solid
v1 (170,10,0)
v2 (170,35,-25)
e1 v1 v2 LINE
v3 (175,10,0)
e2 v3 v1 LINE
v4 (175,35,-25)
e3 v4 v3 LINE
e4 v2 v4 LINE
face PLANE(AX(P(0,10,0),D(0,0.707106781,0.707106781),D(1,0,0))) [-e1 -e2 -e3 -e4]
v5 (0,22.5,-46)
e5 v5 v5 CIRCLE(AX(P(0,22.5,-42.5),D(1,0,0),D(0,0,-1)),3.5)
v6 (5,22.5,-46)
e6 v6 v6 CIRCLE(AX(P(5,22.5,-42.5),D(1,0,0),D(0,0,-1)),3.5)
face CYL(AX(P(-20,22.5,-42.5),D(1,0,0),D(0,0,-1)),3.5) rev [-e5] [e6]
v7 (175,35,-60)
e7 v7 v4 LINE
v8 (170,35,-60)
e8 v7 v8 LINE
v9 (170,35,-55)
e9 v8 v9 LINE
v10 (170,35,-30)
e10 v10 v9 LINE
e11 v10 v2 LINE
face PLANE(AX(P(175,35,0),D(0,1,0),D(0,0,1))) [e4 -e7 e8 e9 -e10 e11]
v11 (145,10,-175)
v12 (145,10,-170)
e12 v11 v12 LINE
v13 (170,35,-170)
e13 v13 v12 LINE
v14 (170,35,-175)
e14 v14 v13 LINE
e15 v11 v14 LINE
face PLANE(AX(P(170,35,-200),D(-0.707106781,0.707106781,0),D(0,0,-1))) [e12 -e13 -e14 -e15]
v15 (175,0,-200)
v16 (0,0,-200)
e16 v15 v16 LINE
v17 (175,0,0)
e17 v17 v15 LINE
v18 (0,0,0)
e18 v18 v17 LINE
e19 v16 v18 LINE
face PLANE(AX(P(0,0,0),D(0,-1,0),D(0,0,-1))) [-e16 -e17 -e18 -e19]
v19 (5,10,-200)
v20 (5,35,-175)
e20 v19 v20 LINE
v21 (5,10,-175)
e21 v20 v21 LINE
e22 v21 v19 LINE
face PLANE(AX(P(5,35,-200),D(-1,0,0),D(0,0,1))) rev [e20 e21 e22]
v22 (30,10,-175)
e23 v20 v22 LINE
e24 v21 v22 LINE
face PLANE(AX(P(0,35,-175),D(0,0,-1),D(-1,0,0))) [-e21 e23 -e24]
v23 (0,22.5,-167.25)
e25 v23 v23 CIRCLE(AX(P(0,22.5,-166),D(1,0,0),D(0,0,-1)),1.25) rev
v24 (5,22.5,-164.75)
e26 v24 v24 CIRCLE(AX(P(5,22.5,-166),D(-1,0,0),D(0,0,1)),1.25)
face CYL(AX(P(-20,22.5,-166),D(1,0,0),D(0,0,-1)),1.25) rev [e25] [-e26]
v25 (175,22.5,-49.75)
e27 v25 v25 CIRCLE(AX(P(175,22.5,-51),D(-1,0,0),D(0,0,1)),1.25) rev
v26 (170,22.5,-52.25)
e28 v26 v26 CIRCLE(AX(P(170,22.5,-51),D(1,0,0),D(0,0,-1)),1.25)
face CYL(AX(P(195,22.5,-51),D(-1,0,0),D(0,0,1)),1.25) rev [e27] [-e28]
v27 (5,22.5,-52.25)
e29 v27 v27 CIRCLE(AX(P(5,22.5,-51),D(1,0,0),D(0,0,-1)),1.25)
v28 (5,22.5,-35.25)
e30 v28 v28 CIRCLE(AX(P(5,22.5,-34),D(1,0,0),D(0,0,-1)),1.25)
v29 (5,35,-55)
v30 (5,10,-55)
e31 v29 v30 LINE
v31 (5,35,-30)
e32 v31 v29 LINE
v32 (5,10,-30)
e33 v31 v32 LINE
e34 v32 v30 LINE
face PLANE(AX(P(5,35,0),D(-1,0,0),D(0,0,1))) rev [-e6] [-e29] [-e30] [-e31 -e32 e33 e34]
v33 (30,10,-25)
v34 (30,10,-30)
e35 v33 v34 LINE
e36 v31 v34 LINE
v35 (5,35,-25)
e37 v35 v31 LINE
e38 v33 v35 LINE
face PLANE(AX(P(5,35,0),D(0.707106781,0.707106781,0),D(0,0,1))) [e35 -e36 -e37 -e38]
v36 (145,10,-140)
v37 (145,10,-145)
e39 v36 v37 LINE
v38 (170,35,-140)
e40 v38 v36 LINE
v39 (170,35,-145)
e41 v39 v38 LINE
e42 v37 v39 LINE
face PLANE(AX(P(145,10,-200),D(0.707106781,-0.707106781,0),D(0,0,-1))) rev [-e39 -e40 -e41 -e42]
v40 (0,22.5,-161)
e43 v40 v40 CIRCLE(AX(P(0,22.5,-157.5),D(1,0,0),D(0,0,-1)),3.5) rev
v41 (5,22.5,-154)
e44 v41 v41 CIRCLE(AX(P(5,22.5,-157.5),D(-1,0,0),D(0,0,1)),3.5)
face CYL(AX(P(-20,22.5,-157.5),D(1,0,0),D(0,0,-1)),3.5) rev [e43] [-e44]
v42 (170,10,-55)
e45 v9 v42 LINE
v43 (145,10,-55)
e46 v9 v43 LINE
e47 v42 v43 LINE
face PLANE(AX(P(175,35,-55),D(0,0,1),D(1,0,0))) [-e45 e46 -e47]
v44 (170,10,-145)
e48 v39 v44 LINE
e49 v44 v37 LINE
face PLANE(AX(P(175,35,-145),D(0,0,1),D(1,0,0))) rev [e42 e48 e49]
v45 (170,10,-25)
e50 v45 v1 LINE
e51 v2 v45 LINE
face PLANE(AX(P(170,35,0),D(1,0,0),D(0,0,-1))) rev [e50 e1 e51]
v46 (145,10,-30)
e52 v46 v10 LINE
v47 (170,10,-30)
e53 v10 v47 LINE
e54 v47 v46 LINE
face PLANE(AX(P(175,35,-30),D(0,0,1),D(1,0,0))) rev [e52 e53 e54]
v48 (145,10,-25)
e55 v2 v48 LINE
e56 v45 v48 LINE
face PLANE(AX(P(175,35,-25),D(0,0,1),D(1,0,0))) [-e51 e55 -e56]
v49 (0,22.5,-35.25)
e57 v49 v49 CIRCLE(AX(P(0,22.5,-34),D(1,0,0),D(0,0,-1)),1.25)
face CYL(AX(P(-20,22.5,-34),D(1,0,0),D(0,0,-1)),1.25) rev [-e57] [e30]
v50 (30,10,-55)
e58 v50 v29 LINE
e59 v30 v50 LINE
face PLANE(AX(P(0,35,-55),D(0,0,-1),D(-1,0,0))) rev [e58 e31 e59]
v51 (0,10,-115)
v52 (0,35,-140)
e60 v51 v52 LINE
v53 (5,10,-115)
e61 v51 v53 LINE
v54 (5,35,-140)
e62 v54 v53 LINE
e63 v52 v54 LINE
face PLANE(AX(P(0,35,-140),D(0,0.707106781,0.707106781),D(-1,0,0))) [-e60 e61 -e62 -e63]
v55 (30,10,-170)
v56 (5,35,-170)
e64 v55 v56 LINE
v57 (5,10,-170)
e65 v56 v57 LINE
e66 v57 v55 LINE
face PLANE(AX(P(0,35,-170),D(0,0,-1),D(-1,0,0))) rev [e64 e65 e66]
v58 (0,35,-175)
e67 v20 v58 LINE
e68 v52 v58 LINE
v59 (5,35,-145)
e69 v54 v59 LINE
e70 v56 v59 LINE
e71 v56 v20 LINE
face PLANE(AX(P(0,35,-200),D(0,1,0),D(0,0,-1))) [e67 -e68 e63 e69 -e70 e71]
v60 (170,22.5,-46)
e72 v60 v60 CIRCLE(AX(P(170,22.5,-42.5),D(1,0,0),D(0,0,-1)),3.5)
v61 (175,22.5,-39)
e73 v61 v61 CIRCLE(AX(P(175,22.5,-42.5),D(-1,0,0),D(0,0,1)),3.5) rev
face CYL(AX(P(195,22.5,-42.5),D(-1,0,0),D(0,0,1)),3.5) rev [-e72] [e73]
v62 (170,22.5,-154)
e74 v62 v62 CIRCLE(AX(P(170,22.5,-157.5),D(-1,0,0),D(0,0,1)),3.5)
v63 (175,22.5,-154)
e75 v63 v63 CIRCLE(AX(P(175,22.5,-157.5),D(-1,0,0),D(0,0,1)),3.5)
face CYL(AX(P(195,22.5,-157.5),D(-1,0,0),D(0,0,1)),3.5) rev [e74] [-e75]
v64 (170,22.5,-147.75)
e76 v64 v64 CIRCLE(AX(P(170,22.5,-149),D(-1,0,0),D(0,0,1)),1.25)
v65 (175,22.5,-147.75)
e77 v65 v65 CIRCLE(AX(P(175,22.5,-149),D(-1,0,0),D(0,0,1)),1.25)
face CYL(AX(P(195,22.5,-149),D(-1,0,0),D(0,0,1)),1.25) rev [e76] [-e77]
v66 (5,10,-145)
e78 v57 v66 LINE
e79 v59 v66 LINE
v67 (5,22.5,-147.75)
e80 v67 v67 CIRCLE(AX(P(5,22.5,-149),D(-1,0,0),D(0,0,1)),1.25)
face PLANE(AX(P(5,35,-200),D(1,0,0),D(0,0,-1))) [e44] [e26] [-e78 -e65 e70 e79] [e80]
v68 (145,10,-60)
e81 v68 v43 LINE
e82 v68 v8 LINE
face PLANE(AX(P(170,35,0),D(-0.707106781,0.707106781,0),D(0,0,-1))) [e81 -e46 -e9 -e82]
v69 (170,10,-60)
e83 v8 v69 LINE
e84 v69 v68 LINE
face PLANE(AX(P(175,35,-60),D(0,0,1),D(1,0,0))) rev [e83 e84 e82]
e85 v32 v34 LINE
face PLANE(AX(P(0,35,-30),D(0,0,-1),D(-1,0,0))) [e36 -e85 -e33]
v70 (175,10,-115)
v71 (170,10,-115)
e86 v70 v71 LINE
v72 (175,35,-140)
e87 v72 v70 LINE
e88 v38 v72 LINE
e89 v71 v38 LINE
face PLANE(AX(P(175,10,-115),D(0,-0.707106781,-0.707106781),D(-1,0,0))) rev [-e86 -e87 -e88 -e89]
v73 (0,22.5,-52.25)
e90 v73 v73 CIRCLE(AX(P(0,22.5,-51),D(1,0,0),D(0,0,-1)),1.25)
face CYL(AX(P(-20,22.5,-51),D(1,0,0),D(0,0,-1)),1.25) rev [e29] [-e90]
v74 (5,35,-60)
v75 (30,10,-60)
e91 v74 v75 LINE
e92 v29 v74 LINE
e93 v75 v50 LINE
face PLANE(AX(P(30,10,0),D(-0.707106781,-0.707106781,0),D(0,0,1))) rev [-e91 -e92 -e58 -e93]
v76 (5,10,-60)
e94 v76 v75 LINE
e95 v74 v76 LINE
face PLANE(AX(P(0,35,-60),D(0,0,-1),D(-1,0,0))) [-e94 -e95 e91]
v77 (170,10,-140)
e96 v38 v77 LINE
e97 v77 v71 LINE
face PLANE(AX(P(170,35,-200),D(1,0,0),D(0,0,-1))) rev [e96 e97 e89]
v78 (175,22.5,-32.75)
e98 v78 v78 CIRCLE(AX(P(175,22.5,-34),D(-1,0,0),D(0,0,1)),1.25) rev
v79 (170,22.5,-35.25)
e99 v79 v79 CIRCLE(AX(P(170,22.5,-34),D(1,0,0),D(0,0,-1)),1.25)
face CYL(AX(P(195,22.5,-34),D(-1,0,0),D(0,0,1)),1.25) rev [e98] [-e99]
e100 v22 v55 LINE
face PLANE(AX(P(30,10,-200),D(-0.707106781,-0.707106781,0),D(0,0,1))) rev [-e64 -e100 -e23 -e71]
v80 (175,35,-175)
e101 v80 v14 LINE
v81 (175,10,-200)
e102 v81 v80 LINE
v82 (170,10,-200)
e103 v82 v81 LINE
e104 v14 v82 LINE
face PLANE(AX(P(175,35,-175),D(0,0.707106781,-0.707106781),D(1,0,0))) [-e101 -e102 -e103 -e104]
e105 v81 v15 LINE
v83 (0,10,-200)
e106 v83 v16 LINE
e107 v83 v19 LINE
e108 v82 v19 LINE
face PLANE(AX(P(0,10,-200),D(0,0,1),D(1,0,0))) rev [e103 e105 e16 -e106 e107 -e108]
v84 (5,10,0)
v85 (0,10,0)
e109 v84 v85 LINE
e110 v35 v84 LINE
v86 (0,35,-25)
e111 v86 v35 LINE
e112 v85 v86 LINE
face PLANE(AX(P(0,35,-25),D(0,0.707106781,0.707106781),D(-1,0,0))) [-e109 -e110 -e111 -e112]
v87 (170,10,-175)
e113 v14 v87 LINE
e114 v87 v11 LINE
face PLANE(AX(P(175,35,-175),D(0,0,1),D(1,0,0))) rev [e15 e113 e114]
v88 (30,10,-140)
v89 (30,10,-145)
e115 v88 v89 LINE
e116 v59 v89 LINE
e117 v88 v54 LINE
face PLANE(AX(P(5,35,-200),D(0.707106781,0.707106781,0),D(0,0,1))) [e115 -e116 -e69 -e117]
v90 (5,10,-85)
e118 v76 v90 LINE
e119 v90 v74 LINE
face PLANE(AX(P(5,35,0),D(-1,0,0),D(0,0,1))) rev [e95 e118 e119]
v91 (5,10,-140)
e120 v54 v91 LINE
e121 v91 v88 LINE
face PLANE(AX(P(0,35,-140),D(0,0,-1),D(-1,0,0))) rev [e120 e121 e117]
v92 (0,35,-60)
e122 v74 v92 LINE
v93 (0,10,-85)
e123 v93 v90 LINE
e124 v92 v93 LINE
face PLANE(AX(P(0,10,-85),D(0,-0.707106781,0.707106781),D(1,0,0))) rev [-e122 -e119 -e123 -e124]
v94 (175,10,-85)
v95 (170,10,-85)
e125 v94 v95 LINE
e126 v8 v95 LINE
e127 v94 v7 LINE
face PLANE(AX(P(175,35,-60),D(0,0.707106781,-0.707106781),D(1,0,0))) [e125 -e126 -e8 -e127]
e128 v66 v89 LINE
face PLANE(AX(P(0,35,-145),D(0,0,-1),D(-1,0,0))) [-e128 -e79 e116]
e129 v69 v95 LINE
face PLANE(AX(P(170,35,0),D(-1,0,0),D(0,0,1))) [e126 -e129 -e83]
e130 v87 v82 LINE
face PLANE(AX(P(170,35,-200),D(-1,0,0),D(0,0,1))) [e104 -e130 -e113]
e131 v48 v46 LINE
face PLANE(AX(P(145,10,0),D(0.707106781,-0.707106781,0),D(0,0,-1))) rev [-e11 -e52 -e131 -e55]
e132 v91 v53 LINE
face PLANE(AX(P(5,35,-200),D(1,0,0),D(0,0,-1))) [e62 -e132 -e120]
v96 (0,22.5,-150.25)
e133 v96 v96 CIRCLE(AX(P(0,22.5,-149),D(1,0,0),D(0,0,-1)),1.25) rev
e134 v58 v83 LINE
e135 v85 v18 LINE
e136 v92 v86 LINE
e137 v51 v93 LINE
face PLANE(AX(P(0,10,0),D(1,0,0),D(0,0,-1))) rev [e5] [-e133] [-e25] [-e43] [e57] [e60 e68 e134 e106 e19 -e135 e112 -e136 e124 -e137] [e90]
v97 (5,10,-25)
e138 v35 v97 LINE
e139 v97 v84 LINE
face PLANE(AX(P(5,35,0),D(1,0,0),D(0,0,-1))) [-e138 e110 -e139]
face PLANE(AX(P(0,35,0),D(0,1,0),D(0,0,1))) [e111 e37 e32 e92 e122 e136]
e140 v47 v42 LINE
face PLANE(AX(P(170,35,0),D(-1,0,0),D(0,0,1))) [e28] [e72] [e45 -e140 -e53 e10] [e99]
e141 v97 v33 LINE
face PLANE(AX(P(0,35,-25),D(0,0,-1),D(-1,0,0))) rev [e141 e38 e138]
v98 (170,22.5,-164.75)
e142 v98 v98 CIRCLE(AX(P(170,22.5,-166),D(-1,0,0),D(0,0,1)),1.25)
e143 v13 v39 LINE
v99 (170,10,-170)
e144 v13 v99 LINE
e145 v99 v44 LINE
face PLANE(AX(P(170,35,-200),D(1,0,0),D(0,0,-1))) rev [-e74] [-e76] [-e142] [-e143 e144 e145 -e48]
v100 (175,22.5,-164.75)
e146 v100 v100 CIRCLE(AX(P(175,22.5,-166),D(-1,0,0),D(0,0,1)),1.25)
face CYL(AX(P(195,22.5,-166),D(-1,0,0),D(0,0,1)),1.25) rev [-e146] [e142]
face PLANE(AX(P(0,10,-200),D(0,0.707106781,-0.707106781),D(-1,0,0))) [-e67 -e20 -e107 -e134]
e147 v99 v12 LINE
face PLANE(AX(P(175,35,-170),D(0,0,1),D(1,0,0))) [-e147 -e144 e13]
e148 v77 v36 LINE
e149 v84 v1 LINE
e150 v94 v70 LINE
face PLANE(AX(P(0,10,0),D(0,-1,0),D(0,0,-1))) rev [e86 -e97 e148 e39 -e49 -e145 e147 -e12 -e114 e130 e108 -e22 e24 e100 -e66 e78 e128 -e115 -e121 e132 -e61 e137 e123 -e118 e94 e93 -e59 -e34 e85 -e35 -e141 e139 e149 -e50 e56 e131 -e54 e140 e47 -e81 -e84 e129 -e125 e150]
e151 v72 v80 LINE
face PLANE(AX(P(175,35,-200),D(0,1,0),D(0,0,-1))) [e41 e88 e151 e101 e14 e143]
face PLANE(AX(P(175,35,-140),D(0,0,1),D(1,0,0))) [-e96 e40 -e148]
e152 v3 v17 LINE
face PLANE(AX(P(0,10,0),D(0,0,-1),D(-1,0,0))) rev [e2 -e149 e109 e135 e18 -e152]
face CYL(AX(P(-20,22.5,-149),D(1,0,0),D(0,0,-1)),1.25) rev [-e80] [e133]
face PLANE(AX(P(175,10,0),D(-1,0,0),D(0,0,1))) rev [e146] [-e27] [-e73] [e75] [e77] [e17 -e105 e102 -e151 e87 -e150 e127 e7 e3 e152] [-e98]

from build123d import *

# Parameters (mm, degrees)
SKETCH1_W                = 175
SKETCH1_H                = 200
BOSS_EXTRUDE1_DEPTH      = 10
SKETCH3_W                = 5
SKETCH3_H                = 25
SKETCH3_W_2              = 25
SKETCH3_H_2              = 5
BOSS_EXTRUDE2_DEPTH      = 25
CHAMFER1_SIZE            = 25
SKETCH4_R                = 3.5
SKETCH4_R_2              = 1.25
CUT_EXTRUDE1_DEPTH       = 25
CHAMFER1_OF_MIRROR1_SIZE = 25


# Read off the part's stored shape, not the designer's step: Mirror2
with BuildPart() as part:
    # Sketch1 → Boss-Extrude1 (new body)
    with BuildSketch(Plane(origin=(0, 0, 0), x_dir=(1, 0, 0), z_dir=(0, 1, 0))):
        with Locations((87.5, 100)):
            Rectangle(SKETCH1_W, SKETCH1_H)
    extrude(amount=BOSS_EXTRUDE1_DEPTH)

    # Sketch3 → Boss-Extrude2 (add)
    with BuildSketch(Plane(origin=(0, 10, 0), x_dir=(1, 0, 0), z_dir=(0, 1, 0))):
        with Locations((2.5, 72.5)):
            Rectangle(SKETCH3_W, SKETCH3_H)
        Polygon((0, 60), (0, 25), (5, 25), (5, 30), (5, 55), (5, 60), align=None)
        with Locations((17.5, 57.5)):
            Rectangle(SKETCH3_W_2, SKETCH3_H_2)
        with Locations((17.5, 27.5)):
            Rectangle(SKETCH3_W_2, SKETCH3_H_2)
        with Locations((2.5, 12.5)):
            Rectangle(SKETCH3_W, SKETCH3_H)
    boss_extrude2 = extrude(amount=BOSS_EXTRUDE2_DEPTH)

    # Chamfer1
    chamfer1_edges = [part.edges().sort_by_distance(p)[0] for p in [
        (2.5, 35, -85),
        (30, 35, -57.5),
        (30, 35, -27.5),
        (2.5, 35, 0),
    ]]
    chamfer(chamfer1_edges, length=CHAMFER1_SIZE - 0.0001)  # a hair under: the kernel refuses the full size

    # Sketch4 → Cut-Extrude1 (cut)
    with BuildSketch(Plane(origin=(5, 0, 0), x_dir=(0, 0, -1), z_dir=(1, 0, 0))):
        with Locations((42.5, 22.5)):
            Circle(SKETCH4_R)
        with Locations((34, 22.5)):
            Circle(SKETCH4_R_2)
        with Locations((51, 22.5)):
            Circle(SKETCH4_R_2)
    cut_extrude1 = extrude(amount=-CUT_EXTRUDE1_DEPTH, mode=Mode.SUBTRACT)

    # Mirror1: Boss-Extrude2, Cut-Extrude1 across plane
    add(boss_extrude2.mirror(Plane(origin=(87.5, 0, 0), x_dir=(0, 0, 1), z_dir=(1, 0, 0))))
    add(cut_extrude1.mirror(Plane(origin=(87.5, 0, 0), x_dir=(0, 0, 1), z_dir=(1, 0, 0))), mode=Mode.SUBTRACT)

    # Chamfer1 of Mirror1
    chamfer1_of_mirror1_edges = [part.edges().sort_by_distance(p)[0] for p in [
        (172.5, 35, -85),
        (145, 35, -57.5),
        (145, 35, -27.5),
        (172.5, 35, 0),
    ]]
    chamfer(chamfer1_of_mirror1_edges, length=CHAMFER1_OF_MIRROR1_SIZE - 0.0001)  # a hair under: the kernel refuses the full size

    # Mirror2: part across plane


with BuildPart() as part_1:
    add(part.part)
    add(part.part.mirror(Plane.XY.offset(-100)))


solid = part_1.part
